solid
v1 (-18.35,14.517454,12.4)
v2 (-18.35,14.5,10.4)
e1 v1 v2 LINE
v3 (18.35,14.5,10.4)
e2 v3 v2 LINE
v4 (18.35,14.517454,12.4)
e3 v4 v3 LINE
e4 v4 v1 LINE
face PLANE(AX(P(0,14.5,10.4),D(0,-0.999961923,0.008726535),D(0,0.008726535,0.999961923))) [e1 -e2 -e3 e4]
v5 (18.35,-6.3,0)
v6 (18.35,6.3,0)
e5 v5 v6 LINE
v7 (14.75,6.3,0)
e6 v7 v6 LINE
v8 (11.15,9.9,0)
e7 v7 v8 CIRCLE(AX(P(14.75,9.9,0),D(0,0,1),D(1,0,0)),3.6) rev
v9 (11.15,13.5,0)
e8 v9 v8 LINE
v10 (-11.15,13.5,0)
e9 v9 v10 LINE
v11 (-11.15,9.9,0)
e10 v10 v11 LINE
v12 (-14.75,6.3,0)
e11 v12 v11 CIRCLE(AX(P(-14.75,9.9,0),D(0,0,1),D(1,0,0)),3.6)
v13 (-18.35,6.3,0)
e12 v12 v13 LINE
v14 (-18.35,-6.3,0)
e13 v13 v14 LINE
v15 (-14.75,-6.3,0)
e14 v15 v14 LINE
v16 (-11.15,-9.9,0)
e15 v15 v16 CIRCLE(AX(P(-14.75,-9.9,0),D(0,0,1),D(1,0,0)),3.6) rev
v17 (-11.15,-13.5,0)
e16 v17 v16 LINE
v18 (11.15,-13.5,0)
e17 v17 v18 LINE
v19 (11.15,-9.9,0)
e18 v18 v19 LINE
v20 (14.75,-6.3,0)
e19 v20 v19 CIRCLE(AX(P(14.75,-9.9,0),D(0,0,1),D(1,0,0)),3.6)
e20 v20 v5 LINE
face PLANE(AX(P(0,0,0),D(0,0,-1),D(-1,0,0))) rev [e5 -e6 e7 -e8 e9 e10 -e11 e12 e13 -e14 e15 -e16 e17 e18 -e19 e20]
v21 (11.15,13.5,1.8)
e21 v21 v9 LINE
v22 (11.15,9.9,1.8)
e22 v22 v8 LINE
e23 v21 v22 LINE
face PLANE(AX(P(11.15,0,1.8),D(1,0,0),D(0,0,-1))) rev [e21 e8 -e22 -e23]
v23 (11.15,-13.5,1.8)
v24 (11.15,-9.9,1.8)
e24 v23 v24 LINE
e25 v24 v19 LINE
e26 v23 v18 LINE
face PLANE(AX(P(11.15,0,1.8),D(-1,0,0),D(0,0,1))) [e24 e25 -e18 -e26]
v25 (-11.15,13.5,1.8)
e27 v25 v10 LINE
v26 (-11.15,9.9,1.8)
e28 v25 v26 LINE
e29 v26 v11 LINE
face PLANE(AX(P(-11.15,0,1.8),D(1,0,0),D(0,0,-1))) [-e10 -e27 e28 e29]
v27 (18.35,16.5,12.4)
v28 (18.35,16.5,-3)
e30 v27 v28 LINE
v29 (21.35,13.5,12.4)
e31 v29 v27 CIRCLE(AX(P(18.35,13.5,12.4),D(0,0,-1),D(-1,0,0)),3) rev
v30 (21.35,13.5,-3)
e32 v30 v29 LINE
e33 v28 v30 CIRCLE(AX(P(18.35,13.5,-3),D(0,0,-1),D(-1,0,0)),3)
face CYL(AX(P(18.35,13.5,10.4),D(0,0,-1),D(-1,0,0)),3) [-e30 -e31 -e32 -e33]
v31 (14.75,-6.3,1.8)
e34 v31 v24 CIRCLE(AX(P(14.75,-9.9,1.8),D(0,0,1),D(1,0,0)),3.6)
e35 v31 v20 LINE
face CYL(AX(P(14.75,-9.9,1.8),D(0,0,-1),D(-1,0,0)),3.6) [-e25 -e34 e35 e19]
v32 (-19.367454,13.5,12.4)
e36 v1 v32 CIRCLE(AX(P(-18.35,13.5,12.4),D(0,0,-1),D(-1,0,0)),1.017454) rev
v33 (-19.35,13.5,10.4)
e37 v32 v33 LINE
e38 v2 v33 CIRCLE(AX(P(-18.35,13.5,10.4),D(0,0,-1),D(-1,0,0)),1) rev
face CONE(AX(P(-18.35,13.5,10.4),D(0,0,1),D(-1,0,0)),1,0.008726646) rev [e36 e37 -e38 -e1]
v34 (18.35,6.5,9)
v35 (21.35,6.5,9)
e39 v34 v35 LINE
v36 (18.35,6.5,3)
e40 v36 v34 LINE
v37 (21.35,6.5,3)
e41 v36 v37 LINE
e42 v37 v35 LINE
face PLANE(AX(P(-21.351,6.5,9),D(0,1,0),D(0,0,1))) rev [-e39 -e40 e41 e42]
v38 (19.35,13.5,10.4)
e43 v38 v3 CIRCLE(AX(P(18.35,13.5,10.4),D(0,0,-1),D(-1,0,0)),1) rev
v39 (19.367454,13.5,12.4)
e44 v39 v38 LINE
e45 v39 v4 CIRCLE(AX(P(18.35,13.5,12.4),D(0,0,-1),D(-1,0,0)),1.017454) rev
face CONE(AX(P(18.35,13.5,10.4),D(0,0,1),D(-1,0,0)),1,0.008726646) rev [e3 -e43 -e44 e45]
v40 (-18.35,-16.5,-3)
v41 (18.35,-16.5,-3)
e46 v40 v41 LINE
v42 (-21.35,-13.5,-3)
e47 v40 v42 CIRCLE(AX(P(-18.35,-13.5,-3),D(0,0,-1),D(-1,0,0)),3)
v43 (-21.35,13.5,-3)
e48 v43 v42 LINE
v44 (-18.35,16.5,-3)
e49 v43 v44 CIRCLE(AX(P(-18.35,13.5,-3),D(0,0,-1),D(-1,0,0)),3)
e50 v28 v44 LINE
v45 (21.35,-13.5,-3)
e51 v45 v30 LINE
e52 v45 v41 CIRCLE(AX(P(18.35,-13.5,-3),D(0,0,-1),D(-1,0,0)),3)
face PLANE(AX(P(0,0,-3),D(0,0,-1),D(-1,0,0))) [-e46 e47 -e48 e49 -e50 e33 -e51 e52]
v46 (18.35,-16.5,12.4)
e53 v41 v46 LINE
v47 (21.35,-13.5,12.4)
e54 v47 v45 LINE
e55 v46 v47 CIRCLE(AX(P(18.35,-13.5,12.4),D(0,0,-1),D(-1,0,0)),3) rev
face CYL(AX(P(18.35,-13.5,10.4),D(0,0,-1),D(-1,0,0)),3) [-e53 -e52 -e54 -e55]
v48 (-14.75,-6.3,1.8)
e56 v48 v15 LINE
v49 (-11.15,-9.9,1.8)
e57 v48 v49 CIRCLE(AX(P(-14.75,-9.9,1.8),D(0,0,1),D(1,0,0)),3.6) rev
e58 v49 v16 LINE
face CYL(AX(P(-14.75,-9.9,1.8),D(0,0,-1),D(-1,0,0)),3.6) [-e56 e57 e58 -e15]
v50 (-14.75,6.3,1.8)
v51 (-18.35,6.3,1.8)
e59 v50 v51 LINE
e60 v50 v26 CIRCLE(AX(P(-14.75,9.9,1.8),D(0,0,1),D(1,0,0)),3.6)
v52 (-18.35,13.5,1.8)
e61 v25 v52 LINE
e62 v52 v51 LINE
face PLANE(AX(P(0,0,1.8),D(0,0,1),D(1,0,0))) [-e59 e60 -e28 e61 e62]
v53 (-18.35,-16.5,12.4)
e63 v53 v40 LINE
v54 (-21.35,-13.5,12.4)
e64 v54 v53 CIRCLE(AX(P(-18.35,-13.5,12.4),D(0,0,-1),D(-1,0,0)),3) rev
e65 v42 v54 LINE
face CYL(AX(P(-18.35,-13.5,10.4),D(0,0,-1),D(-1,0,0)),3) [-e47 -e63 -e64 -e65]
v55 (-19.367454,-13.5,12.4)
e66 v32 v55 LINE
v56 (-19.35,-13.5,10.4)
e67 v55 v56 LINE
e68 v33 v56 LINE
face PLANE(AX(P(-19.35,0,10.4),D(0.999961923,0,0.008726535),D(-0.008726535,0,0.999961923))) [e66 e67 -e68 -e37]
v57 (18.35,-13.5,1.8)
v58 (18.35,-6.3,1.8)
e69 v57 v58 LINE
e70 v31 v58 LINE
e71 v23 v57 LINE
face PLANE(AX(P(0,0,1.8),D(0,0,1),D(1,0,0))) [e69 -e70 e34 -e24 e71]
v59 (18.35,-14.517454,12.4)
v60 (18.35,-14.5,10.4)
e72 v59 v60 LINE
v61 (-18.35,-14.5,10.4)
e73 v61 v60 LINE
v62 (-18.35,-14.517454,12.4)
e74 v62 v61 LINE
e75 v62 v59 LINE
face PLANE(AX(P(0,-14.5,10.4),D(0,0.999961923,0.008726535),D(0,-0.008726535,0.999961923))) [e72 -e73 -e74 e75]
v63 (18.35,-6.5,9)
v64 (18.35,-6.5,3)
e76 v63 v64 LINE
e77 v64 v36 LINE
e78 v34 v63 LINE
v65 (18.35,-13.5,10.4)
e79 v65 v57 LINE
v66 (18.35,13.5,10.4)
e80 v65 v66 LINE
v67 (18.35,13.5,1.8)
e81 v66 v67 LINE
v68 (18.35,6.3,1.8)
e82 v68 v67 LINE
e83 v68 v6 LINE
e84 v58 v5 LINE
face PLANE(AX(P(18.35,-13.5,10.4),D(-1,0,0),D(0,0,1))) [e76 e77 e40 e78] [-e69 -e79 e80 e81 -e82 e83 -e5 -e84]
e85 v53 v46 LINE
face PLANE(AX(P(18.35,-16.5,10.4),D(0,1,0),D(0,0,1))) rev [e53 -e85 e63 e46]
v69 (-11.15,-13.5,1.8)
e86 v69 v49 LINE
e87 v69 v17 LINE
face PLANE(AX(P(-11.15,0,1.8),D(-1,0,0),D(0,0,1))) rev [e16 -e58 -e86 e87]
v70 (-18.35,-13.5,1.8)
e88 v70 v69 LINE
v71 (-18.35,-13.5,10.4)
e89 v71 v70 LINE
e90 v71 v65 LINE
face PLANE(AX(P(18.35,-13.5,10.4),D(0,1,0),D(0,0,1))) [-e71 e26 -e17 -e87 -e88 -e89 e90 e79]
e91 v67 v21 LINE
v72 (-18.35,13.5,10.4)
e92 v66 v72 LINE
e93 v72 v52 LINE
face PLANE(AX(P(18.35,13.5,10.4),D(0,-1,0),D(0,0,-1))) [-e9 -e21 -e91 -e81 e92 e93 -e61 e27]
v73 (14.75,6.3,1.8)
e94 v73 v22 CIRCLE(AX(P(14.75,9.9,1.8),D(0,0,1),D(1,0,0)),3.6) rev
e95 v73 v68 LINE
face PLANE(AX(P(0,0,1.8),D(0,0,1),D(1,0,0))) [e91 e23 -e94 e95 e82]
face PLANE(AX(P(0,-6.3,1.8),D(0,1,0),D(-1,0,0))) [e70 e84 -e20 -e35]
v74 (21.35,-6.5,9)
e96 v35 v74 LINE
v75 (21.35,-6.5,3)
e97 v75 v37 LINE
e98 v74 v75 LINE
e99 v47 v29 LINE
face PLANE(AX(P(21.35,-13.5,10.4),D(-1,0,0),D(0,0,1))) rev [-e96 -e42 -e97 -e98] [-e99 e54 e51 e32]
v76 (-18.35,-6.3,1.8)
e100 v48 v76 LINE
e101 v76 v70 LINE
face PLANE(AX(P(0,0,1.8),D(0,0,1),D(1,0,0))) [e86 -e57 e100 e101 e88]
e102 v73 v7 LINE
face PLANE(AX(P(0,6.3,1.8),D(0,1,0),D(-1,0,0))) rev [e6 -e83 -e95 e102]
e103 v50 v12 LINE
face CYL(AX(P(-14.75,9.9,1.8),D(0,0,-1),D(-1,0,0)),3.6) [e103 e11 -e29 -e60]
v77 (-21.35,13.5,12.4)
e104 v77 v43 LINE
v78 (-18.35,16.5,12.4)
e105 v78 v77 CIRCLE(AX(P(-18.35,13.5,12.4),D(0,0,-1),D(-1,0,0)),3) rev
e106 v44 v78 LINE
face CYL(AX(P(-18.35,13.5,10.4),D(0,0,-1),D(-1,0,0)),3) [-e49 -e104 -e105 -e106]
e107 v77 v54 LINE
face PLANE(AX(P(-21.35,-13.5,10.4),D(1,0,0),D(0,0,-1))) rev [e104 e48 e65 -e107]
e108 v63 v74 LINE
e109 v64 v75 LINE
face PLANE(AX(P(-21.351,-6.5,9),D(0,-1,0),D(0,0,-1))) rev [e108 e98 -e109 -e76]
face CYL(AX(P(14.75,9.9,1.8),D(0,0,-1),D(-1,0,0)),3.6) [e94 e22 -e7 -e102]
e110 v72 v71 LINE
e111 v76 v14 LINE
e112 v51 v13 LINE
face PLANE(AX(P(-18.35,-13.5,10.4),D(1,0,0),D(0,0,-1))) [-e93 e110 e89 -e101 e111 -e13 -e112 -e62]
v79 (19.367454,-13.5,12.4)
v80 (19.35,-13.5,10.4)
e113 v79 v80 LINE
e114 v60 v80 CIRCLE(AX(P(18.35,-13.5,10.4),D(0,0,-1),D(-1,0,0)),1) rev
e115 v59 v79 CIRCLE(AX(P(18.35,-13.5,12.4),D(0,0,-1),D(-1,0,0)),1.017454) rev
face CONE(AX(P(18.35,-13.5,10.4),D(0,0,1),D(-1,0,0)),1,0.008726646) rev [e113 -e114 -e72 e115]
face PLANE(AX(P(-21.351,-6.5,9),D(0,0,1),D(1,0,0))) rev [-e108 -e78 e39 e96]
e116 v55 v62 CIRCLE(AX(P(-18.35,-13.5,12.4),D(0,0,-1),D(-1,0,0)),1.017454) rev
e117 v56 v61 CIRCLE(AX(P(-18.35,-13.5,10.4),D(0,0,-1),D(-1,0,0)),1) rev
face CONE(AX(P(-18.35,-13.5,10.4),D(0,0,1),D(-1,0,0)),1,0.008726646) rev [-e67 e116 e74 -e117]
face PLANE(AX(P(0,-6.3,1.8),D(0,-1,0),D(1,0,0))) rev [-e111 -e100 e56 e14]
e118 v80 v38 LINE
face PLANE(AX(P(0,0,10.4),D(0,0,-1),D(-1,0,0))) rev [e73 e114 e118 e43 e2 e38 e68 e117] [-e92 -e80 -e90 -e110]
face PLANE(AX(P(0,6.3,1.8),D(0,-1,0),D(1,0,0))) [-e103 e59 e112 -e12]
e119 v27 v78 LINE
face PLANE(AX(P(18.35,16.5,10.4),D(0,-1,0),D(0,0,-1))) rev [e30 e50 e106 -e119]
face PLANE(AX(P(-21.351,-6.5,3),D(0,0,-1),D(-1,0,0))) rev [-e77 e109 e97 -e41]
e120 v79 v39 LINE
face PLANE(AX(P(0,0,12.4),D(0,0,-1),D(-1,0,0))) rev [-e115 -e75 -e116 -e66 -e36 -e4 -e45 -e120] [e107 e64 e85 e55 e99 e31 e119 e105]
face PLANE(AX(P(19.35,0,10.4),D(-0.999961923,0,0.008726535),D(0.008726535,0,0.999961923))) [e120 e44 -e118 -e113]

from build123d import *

# Parameters (mm, degrees)
SKETCH1_W           = 27
SKETCH1_H           = 36.7
BOSS_EXTRUDE1_DEPTH = 10.4
SHELL1_T            = 3
BOSS_EXTRUDE2_DEPTH = 1.8
CUT_EXTRUDE1_REACH  = 48.944
SKETCH3_W           = 13
SKETCH3_H           = 6
FILLET1_R           = 3
LIP2_START          = 10.4
LIP2_DEPTH          = 2


with BuildPart() as part:
    # Sketch1 → Boss-Extrude1 (new body)
    with BuildSketch(Plane(origin=(0, 0, 0), x_dir=(0, 1, 0), z_dir=(0, 0, 1))):
        Rectangle(SKETCH1_W, SKETCH1_H)
    extrude(amount=BOSS_EXTRUDE1_DEPTH)

    # Shell1
    shell1_openings = [part.faces().sort_by_distance(p)[0] for p in [
        (0, 0, 10.4),
    ]]
    offset(amount=SHELL1_T, openings=shell1_openings, kind=Kind.INTERSECTION)

    # Sketch2 → Boss-Extrude2 (add)
    with BuildSketch(Plane.XY):
        with BuildLine():
            Line((-11.15, 9.9), (-11.15, 13.5))
            Line((-11.15, 13.5), (-18.35, 13.5))
            Line((-18.35, 13.5), (-18.35, 6.3))
            Line((-18.35, 6.3), (-14.75, 6.3))
            ThreePointArc((-14.75, 6.3), (-12.204415588, 7.354415588), (-11.15, 9.9))
        make_face()
        with BuildLine():
            Line((18.35, 13.5), (11.15, 13.5))
            Line((11.15, 13.5), (11.15, 9.9))
            ThreePointArc((11.15, 9.9), (12.204415588, 7.354415588), (14.75, 6.3))
            Line((14.75, 6.3), (18.35, 6.3))
            Line((18.35, 6.3), (18.35, 13.5))
        make_face()
        with BuildLine():
            Line((18.35, -13.5), (18.35, -6.3))
            Line((18.35, -6.3), (14.75, -6.3))
            ThreePointArc((14.75, -6.3), (12.204415588, -7.354415588), (11.15, -9.9))
            Line((11.15, -9.9), (11.15, -13.5))
            Line((11.15, -13.5), (18.35, -13.5))
        make_face()
        with BuildLine():
            Line((-14.75, -6.3), (-18.35, -6.3))
            Line((-18.35, -6.3), (-18.35, -13.5))
            Line((-18.35, -13.5), (-11.15, -13.5))
            Line((-11.15, -13.5), (-11.15, -9.9))
            ThreePointArc((-11.15, -9.9), (-12.204415588, -7.354415588), (-14.75, -6.3))
        make_face()
    extrude(amount=BOSS_EXTRUDE2_DEPTH)

    # Sketch3 → Cut-Extrude1 (cut, up to next)
    with BuildSketch(Plane.YZ.offset(21.35), mode=Mode.PRIVATE) as cut_extrude1_sk1:
        with Locations((0, 6)):
            Rectangle(SKETCH3_W, SKETCH3_H)
    cut_extrude1_tool1 = extrude(cut_extrude1_sk1.sketch, amount=-CUT_EXTRUDE1_REACH, mode=Mode.PRIVATE) & part.part
    add(cut_extrude1_tool1.solids().sort_by_distance((21.35, 0, 6))[0], mode=Mode.SUBTRACT)

    # Fillet1
    fillet1_edges = [part.edges().sort_by_distance(p)[0] for p in [
        (21.35, 16.5, 3.7),
        (21.35, -16.5, 3.7),
        (-21.35, -16.5, 3.7),
        (-21.35, 16.5, 3.7),
    ]]
    fillet(fillet1_edges, radius=FILLET1_R)

    # Lip2: read off the stored shape, not the designer's step
    # Lip2 outline → Lip2 (add)
    with BuildSketch(Plane.XY.offset(LIP2_START)):
        with BuildLine():
            Line((18.35, 16.5), (-18.35, 16.5))
            ThreePointArc((-18.35, 16.5), (-20.471320344, 15.621320344), (-21.35, 13.5))
            Line((-21.35, 13.5), (-21.35, -13.5))
            ThreePointArc((-21.35, -13.5), (-20.471320344, -15.621320344), (-18.35, -16.5))
            Line((-18.35, -16.5), (18.35, -16.5))
            ThreePointArc((18.35, -16.5), (20.471320344, -15.621320344), (21.35, -13.5))
            Line((21.35, -13.5), (21.35, 13.5))
            ThreePointArc((21.35, 13.5), (20.471320344, 15.621320344), (18.35, 16.5))
        make_face()
    extrude(amount=LIP2_DEPTH)

    # Lip2 2: loft between two sections, ruled curve by curve
    lip2_2_from = [
        Edge.make_three_point_arc((18.35, -14.5, 10.4), (19.057106781, -14.207106781, 10.4), (19.35, -13.5, 10.4)),
        Edge.make_three_point_arc((-19.35, -13.5, 10.4), (-19.057106781, -14.207106781, 10.4), (-18.35, -14.5, 10.4)),
        Edge.make_three_point_arc((-18.35, 14.5, 10.4), (-19.057106781, 14.207106781, 10.4), (-19.35, 13.5, 10.4)),
        Edge.make_three_point_arc((19.35, 13.5, 10.4), (19.057106781, 14.207106781, 10.4), (18.35, 14.5, 10.4)),
        Edge.make_line((19.35, -13.5, 10.4), (19.35, 13.5, 10.4)),
        Edge.make_line((-18.35, -14.5, 10.4), (18.35, -14.5, 10.4)),
        Edge.make_line((-19.35, 13.5, 10.4), (-19.35, -13.5, 10.4)),
        Edge.make_line((18.35, 14.5, 10.4), (-18.35, 14.5, 10.4)),
    ]
    lip2_2_to = [
        Edge.make_three_point_arc((18.35, -14.517453736, 12.4), (19.069448436, -14.219448436, 12.4), (19.367453736, -13.5, 12.4)),
        Edge.make_three_point_arc((-19.367453736, -13.5, 12.4), (-19.069448436, -14.219448436, 12.4), (-18.35, -14.517453736, 12.4)),
        Edge.make_three_point_arc((-18.35, 14.517453736, 12.4), (-19.069448436, 14.219448436, 12.4), (-19.367453736, 13.5, 12.4)),
        Edge.make_three_point_arc((19.367453736, 13.5, 12.4), (19.069448436, 14.219448436, 12.4), (18.35, 14.517453736, 12.4)),
        Edge.make_line((19.367453736, -13.5, 12.4), (19.367453736, 13.5, 12.4)),
        Edge.make_line((-18.35, -14.517453736, 12.4), (18.35, -14.517453736, 12.4)),
        Edge.make_line((-19.367453736, 13.5, 12.4), (-19.367453736, -13.5, 12.4)),
        Edge.make_line((18.35, 14.517453736, 12.4), (-18.35, 14.517453736, 12.4)),
    ]
    lip2_2 = Solid(Shell([*[Face.make_surface_from_curves(lip2_2_from[k], lip2_2_to[k]) for k in range(8)], Face(Wire(lip2_2_from)), Face(Wire(lip2_2_to))]))
    add(lip2_2, mode=Mode.SUBTRACT)


solid = part.part
